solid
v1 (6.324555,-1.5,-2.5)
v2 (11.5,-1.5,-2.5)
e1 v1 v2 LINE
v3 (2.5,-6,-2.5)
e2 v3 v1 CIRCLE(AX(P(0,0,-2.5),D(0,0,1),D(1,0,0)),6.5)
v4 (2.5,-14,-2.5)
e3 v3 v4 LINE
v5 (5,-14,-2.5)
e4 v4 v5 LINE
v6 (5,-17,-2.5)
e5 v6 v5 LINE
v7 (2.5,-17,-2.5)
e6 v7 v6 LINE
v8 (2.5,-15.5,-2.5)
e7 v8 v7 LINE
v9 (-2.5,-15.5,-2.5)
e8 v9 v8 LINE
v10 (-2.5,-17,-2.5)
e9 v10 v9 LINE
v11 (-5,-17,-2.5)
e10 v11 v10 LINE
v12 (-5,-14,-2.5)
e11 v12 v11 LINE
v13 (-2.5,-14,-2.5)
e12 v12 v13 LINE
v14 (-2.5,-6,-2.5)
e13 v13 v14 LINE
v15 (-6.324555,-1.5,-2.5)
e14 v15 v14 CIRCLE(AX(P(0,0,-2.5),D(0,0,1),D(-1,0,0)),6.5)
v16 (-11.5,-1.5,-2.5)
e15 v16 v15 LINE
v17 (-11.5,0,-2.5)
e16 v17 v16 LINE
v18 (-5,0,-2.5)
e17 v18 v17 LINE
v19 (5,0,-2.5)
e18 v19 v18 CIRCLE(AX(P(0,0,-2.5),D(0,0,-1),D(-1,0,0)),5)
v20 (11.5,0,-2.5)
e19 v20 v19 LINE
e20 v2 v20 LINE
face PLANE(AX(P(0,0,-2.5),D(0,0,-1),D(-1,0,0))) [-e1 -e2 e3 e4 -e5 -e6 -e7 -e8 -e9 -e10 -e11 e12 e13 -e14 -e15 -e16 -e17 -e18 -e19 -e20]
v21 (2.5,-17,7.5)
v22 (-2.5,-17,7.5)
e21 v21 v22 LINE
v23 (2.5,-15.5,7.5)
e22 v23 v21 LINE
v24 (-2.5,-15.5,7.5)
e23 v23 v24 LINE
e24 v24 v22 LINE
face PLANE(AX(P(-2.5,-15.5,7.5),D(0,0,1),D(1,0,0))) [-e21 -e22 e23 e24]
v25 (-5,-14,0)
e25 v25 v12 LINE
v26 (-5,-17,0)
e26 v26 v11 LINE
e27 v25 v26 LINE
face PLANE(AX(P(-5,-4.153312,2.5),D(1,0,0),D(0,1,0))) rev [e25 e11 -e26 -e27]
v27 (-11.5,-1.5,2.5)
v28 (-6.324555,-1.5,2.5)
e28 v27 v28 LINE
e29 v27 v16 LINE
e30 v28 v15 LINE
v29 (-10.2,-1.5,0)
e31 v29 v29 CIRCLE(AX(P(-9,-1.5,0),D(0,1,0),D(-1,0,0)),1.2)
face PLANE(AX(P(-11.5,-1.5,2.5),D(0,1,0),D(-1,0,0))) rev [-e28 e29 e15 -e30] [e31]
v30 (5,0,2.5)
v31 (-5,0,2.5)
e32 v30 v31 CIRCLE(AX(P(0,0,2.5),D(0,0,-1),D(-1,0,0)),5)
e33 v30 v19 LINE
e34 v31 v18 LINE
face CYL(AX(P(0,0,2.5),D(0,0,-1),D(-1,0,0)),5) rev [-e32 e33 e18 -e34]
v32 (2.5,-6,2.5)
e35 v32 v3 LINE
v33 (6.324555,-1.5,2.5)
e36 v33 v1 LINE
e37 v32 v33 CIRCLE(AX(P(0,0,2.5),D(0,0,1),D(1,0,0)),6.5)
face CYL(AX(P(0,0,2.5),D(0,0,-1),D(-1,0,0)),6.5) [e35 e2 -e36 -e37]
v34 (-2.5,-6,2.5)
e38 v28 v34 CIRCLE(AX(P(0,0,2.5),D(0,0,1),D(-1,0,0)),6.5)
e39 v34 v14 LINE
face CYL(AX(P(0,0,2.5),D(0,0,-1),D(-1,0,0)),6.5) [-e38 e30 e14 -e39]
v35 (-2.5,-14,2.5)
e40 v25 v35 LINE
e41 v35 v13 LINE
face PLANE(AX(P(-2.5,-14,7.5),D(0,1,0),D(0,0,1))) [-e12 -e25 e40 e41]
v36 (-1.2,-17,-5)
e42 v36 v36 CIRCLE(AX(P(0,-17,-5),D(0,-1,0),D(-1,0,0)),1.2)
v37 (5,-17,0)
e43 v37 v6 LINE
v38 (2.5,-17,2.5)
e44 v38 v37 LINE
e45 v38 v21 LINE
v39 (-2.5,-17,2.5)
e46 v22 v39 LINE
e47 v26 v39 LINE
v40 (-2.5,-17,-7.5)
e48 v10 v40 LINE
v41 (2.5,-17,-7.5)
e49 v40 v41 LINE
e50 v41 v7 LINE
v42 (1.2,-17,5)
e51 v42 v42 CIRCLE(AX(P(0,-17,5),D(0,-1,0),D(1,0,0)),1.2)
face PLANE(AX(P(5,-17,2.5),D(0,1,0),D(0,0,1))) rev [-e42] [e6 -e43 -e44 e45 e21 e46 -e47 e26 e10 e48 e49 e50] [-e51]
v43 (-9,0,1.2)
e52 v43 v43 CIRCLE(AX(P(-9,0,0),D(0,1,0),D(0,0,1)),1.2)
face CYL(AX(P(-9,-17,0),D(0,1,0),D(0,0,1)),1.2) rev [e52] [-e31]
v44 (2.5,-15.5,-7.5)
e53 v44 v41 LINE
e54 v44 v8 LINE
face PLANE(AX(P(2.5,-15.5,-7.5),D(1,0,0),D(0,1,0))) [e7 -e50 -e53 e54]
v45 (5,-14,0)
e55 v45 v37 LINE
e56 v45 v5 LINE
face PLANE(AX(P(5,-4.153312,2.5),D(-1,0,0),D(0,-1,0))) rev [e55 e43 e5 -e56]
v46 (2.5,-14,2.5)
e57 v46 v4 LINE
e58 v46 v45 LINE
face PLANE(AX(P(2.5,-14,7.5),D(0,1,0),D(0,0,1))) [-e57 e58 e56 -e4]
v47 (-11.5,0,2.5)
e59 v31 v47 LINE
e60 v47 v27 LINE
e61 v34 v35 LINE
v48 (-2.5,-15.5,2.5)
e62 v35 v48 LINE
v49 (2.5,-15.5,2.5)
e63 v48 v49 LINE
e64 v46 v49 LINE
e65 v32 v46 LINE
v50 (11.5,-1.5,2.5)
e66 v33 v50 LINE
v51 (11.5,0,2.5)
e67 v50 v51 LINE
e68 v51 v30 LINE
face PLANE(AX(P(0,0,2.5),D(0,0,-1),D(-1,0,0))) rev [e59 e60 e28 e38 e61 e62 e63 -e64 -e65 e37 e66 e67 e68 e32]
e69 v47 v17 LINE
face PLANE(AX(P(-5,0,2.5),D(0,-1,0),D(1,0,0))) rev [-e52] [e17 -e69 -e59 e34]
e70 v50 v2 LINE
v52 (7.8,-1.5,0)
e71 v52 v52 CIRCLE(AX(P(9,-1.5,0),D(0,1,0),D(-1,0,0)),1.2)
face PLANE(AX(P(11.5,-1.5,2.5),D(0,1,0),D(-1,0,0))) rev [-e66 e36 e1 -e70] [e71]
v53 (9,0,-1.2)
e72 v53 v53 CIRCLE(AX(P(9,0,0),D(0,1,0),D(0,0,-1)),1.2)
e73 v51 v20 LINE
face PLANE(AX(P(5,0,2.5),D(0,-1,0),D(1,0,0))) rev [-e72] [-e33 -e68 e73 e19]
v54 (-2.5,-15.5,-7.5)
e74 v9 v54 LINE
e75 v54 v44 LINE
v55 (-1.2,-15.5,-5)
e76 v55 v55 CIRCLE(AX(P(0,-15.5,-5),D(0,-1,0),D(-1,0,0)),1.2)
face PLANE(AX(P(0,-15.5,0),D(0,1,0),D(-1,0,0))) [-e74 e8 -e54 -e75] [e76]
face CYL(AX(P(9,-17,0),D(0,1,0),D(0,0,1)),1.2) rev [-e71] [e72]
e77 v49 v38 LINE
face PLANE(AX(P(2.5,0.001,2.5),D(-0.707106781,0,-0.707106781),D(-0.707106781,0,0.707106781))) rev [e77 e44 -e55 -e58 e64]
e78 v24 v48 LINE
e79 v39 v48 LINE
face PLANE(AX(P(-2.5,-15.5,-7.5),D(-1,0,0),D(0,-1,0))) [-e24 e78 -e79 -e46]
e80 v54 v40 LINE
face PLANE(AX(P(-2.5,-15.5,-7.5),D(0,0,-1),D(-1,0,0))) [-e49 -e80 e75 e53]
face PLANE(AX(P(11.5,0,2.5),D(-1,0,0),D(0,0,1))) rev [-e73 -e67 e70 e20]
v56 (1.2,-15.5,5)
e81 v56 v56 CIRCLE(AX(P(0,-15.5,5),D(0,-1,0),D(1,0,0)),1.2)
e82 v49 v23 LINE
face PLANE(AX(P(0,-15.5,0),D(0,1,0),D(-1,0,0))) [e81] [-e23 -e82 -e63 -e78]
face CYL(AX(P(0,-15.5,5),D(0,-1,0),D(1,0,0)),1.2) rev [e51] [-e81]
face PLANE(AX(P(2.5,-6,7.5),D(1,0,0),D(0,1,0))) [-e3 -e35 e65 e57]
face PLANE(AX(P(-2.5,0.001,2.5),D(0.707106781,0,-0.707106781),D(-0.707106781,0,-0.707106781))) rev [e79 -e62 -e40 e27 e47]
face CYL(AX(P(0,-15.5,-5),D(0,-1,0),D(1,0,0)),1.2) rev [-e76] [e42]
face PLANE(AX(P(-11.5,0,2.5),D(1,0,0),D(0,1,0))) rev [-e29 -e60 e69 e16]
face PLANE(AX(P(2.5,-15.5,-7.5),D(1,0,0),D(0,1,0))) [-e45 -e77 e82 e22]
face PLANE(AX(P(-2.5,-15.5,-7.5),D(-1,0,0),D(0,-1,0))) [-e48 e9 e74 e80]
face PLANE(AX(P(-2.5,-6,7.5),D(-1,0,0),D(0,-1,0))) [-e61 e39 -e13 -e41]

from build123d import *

# Parameters (mm, degrees)
BOSS_EXTRUDE1_DEPTH     = 2.5
SKETCH2_R               = 1.2
CUT_EXTRUDE1_DEPTH      = 21.676073128
SKETCH3_W               = 5
SKETCH3_H               = 15
SKETCH3_R               = 1.2
BOSS_EXTRUDE2_DEPTH     = 1.5
CUT_EXTRUDE2_REACH      = 23.852
CUT_EXTRUDE2_END_RADIUS = 6.5
CUT_EXTRUDE4_START      = -2.5
CUT_EXTRUDE4_DEPTH      = 5


# Read off the part's stored shape, not the designer's step: Cut-Extrude4
with BuildPart() as part:
    # Sketch1 → Boss-Extrude1 (new, symmetric)
    with BuildSketch(Plane.XY):
        with BuildLine():
            Line((5, 0), (11.5, 0))
            Line((11.5, 0), (11.5, -1.5))
            Line((11.5, -1.5), (6.32455532, -1.5))
            ThreePointArc((6.32455532, -1.5), (5.81561728, -2.903204376), (5, -4.153311931))
            Line((5, -4.153311931), (5, -17))
            Line((5, -17), (-5, -17))
            Line((-5, -17), (-5, -4.153311931))
            ThreePointArc((-5, -4.153311931), (-5.81561728, -2.903204376), (-6.32455532, -1.5))
            Line((-6.32455532, -1.5), (-11.5, -1.5))
            Line((-11.5, -1.5), (-11.5, 0))
            Line((-11.5, 0), (-5, 0))
            ThreePointArc((-5, 0), (0, -5), (5, 0))
        make_face()
    extrude(amount=BOSS_EXTRUDE1_DEPTH, both=True)

    # Sketch2 → Cut-Extrude1 (cut, through all)
    with BuildSketch(Plane(origin=(0, 0, 0), x_dir=(1, 0, 0), z_dir=(0, 1, 0))):
        with Locations(Location((-9, 0, 0), (0, 0, 270))):
            Circle(SKETCH2_R)
        with Locations(Location((9, 0, 0), (0, 0, 180))):
            Circle(SKETCH2_R)
    extrude(amount=-CUT_EXTRUDE1_DEPTH, mode=Mode.SUBTRACT)

    # Sketch3 → Boss-Extrude2 (add)
    with BuildSketch(Plane.XZ.offset(17)):
        Rectangle(SKETCH3_W, SKETCH3_H)
        with Locations((0, 5)):
            Circle(SKETCH3_R, mode=Mode.SUBTRACT)
        with Locations(Location((0, -5, 0), (0, 0, 180))):
            Circle(SKETCH3_R, mode=Mode.SUBTRACT)
    extrude(amount=-BOSS_EXTRUDE2_DEPTH)

    # Cut-Extrude2: up to this cylinder (the profile starts outside it)
    cut_extrude2_end = Plane(origin=(0, 0, 1.666667), z_dir=(0, 0, -1)) * Cylinder(CUT_EXTRUDE2_END_RADIUS, 61.704, mode=Mode.PRIVATE)
    # Sketch4 → Cut-Extrude2 (cut, up to the surface)
    with BuildSketch(Plane.XZ.offset(17), mode=Mode.PRIVATE) as cut_extrude2_sk1:
        Polygon((2.5, 2.5), (5, 0), (5, 2.5), align=None)
    cut_extrude2_tool1 = extrude(cut_extrude2_sk1.sketch, amount=-CUT_EXTRUDE2_REACH, mode=Mode.PRIVATE) - cut_extrude2_end
    add(cut_extrude2_tool1.solids().sort_by_distance((4.166667, -17, 1.666667))[0], mode=Mode.SUBTRACT)
    # Sketch4 → Cut-Extrude2 (cut, up to the surface)
    with BuildSketch(Plane.XZ.offset(17), mode=Mode.PRIVATE) as cut_extrude2_sk2:
        Polygon((-5, 2.5), (-2.5, 2.5), (-5, 0), align=None)
    cut_extrude2_tool2 = extrude(cut_extrude2_sk2.sketch, amount=-CUT_EXTRUDE2_REACH, mode=Mode.PRIVATE) - cut_extrude2_end
    add(cut_extrude2_tool2.solids().sort_by_distance((-4.166667, -17, 1.666667))[0], mode=Mode.SUBTRACT)

    # Cut-Extrude4 outline → Cut-Extrude4 (cut)
    with BuildSketch(Plane.XY.offset(CUT_EXTRUDE4_START)):
        with BuildLine():
            Line((-2.5, -14), (-2.5, -6))
            ThreePointArc((-2.5, -6), (-3.862002616, -5.228282299), (-5, -4.153311931))
            Line((-5, -4.153311931), (-5, -14))
            Line((-5, -14), (-2.5, -14))
        make_face()
        with BuildLine():
            Line((5, -14), (5, -4.153311931))
            ThreePointArc((5, -4.153311931), (3.862002616, -5.228282299), (2.5, -6))
            Line((2.5, -6), (2.5, -14))
            Line((2.5, -14), (5, -14))
        make_face()
    extrude(amount=CUT_EXTRUDE4_DEPTH, mode=Mode.SUBTRACT)


solid = part.part
